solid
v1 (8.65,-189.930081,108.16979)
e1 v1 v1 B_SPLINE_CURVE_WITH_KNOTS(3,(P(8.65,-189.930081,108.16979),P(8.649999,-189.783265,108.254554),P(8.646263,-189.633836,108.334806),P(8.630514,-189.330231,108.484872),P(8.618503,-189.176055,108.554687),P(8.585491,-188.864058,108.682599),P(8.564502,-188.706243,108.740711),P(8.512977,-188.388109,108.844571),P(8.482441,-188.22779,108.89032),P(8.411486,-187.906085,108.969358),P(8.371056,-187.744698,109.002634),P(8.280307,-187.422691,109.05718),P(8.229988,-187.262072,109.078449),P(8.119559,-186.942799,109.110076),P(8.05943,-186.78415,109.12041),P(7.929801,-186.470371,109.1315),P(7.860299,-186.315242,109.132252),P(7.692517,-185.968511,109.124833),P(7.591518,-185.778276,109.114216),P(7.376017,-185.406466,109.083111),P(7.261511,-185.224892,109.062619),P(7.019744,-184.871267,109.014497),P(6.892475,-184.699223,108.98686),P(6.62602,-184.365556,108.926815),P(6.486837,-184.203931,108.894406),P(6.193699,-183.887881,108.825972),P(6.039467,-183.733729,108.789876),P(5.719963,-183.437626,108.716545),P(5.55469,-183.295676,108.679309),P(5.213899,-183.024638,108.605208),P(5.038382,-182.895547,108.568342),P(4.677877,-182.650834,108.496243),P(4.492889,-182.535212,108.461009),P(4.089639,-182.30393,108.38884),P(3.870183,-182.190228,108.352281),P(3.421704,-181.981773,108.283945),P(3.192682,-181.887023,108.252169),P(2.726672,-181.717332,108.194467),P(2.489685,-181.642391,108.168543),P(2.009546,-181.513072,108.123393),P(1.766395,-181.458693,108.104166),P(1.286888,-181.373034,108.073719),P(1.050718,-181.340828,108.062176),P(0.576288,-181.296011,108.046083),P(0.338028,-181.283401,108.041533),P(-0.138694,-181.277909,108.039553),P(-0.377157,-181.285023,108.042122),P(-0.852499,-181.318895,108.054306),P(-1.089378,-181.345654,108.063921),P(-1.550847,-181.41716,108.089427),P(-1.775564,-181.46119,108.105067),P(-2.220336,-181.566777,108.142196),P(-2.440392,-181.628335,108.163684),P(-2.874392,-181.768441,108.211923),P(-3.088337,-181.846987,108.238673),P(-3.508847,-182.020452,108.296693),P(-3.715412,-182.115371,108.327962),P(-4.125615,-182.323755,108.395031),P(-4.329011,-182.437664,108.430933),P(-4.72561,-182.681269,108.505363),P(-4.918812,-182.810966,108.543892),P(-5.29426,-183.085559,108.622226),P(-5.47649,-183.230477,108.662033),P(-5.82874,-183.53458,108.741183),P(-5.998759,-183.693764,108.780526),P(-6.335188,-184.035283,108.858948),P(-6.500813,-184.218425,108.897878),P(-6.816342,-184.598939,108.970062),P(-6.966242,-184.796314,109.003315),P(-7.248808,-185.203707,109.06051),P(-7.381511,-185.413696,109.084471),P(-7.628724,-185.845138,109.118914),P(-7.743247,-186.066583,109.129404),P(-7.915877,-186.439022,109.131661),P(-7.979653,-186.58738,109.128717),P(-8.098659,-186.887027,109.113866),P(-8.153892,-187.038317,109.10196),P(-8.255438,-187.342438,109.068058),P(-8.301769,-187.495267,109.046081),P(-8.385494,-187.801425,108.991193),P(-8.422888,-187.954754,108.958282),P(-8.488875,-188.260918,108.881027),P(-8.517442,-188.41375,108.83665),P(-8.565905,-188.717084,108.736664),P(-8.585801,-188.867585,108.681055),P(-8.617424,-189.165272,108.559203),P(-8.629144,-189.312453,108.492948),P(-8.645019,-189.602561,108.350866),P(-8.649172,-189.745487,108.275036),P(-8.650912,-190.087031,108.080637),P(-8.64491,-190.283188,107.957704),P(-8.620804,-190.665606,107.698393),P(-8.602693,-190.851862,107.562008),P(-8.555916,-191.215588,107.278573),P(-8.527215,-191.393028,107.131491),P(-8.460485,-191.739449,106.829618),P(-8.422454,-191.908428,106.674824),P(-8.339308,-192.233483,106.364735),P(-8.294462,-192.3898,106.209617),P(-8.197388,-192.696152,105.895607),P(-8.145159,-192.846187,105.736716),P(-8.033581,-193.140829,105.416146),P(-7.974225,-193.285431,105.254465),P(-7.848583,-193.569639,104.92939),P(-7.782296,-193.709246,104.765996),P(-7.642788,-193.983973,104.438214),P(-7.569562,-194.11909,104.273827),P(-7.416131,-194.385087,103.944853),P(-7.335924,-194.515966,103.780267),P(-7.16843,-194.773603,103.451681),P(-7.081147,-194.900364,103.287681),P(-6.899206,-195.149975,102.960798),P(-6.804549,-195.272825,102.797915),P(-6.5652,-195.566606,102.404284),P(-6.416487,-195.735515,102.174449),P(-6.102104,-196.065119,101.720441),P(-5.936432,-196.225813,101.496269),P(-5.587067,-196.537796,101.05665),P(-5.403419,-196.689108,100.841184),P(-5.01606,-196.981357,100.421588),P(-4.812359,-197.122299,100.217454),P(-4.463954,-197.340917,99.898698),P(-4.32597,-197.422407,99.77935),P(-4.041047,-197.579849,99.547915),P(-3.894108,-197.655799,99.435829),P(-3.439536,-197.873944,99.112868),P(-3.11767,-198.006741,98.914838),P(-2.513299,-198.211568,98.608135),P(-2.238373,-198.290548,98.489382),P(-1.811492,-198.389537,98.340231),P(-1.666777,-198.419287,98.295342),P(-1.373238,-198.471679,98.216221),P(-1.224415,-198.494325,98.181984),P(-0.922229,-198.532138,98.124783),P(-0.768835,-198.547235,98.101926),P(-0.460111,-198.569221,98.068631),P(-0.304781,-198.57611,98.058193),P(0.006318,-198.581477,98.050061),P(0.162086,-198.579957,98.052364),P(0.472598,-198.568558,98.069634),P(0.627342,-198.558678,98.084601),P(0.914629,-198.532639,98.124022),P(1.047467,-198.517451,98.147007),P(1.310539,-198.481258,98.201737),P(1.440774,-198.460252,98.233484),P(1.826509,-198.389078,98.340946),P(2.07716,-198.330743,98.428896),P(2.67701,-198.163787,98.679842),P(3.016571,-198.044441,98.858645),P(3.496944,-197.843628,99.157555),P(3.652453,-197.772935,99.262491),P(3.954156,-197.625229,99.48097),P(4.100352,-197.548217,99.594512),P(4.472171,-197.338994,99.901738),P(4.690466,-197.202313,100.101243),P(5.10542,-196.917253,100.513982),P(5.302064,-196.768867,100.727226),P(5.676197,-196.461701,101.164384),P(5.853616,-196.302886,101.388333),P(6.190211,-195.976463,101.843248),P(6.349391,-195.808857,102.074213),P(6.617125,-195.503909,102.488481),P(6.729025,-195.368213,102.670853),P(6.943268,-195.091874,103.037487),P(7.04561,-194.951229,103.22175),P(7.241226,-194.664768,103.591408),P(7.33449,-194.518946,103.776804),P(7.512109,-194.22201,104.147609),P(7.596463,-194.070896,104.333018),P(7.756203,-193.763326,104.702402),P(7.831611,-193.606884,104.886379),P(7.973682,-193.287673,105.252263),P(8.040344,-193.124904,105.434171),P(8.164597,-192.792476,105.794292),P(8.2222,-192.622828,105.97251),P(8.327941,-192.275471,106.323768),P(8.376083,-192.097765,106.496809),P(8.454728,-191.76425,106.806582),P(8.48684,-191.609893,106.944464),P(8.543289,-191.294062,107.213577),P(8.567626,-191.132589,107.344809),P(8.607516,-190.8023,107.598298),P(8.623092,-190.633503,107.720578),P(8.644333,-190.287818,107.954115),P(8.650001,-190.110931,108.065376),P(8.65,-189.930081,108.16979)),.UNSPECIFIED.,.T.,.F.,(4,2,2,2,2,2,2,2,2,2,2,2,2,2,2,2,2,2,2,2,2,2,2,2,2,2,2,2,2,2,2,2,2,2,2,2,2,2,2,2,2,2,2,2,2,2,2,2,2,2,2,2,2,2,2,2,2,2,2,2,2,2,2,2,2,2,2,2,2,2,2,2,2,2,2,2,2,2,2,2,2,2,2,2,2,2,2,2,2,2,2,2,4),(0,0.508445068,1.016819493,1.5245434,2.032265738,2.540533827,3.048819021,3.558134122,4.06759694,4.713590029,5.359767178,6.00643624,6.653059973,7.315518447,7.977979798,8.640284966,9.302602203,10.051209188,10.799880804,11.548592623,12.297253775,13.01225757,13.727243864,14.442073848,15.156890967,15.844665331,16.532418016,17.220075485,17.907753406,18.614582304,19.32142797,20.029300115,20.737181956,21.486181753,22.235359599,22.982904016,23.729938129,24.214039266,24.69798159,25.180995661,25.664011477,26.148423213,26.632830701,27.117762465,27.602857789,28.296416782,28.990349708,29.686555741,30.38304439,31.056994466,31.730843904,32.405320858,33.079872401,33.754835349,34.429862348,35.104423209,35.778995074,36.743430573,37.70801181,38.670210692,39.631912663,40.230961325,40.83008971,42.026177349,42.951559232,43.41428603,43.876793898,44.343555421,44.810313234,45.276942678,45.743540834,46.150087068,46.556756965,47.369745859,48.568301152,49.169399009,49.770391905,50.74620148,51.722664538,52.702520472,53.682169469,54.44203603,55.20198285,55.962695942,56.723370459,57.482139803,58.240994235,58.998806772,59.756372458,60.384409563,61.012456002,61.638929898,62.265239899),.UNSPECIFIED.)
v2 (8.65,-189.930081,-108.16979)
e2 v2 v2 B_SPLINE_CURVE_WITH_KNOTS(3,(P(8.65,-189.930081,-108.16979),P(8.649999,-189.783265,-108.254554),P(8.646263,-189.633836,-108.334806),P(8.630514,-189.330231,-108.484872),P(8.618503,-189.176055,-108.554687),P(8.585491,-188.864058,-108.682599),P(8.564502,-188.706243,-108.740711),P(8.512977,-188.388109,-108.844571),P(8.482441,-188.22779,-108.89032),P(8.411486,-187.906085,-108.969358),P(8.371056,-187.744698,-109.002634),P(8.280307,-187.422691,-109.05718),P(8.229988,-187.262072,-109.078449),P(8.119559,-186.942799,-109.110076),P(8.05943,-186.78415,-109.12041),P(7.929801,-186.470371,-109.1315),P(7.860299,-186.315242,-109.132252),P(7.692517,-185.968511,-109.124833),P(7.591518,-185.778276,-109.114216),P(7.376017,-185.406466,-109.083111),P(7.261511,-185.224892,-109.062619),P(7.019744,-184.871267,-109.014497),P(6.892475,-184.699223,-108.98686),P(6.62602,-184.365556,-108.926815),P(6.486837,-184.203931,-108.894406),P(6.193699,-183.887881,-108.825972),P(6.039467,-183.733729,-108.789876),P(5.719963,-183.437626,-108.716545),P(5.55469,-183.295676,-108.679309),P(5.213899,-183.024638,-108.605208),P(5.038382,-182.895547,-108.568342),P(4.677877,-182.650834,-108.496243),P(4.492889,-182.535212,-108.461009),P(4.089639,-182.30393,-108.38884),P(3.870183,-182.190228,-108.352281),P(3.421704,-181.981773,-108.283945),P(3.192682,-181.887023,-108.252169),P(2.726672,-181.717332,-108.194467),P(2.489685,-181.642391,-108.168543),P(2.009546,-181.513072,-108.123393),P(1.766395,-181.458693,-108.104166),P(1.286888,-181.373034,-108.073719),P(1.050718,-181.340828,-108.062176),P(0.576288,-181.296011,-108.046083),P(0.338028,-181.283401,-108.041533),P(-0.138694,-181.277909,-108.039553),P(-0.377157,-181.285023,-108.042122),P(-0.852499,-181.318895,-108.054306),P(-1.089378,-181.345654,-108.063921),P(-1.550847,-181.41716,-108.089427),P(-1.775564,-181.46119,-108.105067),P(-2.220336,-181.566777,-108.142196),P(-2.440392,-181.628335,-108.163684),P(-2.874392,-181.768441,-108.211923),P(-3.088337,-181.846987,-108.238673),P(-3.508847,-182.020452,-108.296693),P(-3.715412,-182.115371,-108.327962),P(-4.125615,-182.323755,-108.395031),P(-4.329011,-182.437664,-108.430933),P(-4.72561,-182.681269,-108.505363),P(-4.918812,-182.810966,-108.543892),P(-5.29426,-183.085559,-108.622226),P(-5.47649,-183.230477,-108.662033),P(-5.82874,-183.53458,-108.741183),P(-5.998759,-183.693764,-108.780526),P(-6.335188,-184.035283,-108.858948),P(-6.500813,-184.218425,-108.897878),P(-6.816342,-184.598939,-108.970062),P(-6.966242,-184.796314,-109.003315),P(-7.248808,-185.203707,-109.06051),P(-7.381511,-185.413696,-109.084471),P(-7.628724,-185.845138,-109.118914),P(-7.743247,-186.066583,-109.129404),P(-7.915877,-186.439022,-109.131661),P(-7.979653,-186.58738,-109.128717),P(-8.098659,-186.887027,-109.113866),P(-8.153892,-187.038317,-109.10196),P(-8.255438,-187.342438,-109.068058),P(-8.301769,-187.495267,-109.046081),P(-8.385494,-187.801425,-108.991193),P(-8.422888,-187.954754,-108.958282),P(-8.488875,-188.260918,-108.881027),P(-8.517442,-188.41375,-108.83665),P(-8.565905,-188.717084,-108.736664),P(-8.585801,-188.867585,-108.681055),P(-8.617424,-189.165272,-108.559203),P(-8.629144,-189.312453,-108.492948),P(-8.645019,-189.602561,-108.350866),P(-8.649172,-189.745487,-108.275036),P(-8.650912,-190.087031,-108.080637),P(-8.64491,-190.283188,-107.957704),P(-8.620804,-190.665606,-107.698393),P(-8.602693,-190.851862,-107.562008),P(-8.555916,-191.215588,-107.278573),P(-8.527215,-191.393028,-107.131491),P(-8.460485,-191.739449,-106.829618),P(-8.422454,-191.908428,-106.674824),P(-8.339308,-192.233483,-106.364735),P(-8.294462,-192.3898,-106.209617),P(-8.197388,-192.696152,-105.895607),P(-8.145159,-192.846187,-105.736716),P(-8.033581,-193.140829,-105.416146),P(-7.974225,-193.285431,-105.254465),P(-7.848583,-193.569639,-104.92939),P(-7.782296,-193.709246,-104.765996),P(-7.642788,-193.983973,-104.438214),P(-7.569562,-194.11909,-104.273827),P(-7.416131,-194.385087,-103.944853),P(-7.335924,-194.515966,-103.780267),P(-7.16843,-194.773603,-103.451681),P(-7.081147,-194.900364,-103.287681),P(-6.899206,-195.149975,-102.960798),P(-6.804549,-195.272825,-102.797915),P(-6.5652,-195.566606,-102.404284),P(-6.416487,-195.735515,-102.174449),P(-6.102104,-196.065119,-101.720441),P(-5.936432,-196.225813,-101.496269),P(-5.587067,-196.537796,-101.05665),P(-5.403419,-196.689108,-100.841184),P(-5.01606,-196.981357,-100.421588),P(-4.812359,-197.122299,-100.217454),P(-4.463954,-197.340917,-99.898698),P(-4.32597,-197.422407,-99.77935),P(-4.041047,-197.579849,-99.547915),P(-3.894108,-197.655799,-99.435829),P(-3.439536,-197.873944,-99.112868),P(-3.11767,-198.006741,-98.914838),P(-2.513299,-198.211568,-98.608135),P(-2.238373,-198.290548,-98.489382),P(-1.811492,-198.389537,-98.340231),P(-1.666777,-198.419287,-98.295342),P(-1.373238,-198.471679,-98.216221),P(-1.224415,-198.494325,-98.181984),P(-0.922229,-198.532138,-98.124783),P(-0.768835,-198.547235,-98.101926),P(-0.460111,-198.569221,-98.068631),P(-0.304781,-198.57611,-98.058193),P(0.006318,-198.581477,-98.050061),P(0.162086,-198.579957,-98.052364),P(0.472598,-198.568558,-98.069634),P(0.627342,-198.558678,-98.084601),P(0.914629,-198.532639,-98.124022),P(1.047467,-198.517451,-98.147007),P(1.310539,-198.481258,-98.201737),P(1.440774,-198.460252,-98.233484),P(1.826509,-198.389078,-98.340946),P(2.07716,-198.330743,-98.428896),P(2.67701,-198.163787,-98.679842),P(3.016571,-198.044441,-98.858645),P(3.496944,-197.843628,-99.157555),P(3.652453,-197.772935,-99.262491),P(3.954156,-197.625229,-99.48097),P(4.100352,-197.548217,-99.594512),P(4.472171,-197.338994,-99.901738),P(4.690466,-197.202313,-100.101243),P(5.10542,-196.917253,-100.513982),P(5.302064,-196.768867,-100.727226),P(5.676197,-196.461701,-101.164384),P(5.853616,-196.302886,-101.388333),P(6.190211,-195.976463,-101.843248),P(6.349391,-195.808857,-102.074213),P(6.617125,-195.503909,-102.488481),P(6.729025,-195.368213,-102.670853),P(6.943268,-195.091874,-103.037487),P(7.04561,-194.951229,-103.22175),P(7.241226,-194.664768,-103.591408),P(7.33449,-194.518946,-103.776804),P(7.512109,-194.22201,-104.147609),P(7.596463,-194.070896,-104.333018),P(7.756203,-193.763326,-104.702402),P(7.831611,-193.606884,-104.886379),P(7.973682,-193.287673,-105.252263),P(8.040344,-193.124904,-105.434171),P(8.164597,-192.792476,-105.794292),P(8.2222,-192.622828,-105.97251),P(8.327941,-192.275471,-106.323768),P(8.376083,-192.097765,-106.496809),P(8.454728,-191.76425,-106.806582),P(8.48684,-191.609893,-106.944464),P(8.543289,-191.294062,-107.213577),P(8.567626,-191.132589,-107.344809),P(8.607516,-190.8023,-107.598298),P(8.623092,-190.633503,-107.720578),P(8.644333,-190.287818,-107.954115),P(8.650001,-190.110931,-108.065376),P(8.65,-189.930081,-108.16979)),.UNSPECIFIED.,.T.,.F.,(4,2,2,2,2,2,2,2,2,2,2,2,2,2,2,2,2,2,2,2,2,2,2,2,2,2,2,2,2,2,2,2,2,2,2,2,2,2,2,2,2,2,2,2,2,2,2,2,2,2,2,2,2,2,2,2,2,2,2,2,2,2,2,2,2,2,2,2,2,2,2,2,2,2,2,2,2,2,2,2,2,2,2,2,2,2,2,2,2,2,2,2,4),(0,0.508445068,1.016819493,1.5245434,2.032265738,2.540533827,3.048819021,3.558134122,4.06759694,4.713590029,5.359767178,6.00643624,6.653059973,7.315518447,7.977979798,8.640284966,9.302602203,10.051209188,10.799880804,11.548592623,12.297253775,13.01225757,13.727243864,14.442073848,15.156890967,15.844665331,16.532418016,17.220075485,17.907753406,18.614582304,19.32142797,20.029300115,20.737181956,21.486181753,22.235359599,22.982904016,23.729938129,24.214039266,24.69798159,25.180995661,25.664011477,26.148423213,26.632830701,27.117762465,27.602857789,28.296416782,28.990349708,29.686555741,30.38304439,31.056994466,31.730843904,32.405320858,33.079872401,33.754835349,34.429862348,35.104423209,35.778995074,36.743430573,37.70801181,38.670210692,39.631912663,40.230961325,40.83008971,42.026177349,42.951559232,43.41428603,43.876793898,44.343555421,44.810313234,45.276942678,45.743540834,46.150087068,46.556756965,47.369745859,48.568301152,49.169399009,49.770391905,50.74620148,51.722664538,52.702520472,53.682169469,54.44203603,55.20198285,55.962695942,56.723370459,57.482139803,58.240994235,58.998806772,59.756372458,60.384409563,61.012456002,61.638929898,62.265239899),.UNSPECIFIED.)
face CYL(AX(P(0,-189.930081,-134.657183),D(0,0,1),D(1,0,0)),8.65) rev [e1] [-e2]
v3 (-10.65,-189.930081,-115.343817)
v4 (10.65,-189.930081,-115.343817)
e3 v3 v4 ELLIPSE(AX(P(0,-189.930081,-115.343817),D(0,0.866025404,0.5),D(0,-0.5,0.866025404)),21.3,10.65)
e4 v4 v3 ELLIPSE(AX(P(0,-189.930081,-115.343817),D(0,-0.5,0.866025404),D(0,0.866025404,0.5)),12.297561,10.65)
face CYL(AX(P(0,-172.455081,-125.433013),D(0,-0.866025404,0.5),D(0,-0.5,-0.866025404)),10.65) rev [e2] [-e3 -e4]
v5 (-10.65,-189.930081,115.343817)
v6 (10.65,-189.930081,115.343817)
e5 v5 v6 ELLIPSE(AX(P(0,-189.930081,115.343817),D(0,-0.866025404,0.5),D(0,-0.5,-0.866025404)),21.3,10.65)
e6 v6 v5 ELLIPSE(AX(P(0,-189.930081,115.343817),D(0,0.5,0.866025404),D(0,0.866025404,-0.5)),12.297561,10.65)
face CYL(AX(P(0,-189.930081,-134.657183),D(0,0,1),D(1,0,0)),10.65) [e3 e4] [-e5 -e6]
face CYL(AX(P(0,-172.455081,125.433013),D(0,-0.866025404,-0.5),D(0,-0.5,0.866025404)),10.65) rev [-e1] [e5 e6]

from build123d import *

# Parameters (mm, degrees)
EXTRUDE_START           = -96.897475547
EXTRUDE_1_OUTLINE_R     = 10.65
EXTRUDE_1_OUTLINE_R_2   = 8.65
EXTRUDE_1_DEPTH         = 96.897475547
EXTRUDE_START_2         = -115.343816848
EXTRUDE_1_2_OUTLINE_R   = 10.65
EXTRUDE_1_2_OUTLINE_R_2 = 8.65
EXTRUDE_1_2_DEPTH       = 18.446341301
EXTRUDE_1_3_OUTLINE_W   = 10.65
EXTRUDE_1_3_OUTLINE_H   = 27.732310486


with BuildPart() as part:
    # Бобышка-Вытянуть1: read off the stored shape, not the designer's step
    # Бобышка-Вытянуть1 outline → Бобышка-Вытянуть1 (new body)
    with BuildSketch(Plane.XY.offset(EXTRUDE_START)):
        with Locations((0, -189.930080757)):
            Circle(EXTRUDE_1_OUTLINE_R)
        with Locations((0, -189.930080757)):
            Circle(EXTRUDE_1_OUTLINE_R_2, mode=Mode.SUBTRACT)
    extrude(amount=EXTRUDE_1_DEPTH)

    # Extrude 1 2 outline → Extrude 1 2 (add)
    with BuildSketch(Plane.XY.offset(EXTRUDE_START_2)):
        with Locations((0, -189.930080757)):
            Circle(EXTRUDE_1_2_OUTLINE_R)
        with Locations((0, -189.930080757)):
            Circle(EXTRUDE_1_2_OUTLINE_R_2, mode=Mode.SUBTRACT)
    extrude(amount=EXTRUDE_1_2_DEPTH)

    # Extrude 1 3 outline → Extrude 1 3 (revolve, cut)
    with BuildSketch(Plane(origin=(0, -97.427857926, -168.75), x_dir=(1, 0, 0), z_dir=(0, 0.4999999999998773, 0.8660254037845095))):
        with Locations((5.325, -111.455351147)):
            Rectangle(EXTRUDE_1_3_OUTLINE_W, EXTRUDE_1_3_OUTLINE_H)
    revolve(axis=Axis((0, -97.427857926, -168.75), (0, 0.8660254037845095, -0.4999999999998773)), mode=Mode.SUBTRACT)

    # Зеркальное отражение1: part across plane


with BuildPart() as part_1:
    add(part.part)
    add(part.part.mirror(Plane(origin=(0, -189.930080757, 0), x_dir=(1, 0, 0), z_dir=(0, 0, 1))))


solid = part_1.part
